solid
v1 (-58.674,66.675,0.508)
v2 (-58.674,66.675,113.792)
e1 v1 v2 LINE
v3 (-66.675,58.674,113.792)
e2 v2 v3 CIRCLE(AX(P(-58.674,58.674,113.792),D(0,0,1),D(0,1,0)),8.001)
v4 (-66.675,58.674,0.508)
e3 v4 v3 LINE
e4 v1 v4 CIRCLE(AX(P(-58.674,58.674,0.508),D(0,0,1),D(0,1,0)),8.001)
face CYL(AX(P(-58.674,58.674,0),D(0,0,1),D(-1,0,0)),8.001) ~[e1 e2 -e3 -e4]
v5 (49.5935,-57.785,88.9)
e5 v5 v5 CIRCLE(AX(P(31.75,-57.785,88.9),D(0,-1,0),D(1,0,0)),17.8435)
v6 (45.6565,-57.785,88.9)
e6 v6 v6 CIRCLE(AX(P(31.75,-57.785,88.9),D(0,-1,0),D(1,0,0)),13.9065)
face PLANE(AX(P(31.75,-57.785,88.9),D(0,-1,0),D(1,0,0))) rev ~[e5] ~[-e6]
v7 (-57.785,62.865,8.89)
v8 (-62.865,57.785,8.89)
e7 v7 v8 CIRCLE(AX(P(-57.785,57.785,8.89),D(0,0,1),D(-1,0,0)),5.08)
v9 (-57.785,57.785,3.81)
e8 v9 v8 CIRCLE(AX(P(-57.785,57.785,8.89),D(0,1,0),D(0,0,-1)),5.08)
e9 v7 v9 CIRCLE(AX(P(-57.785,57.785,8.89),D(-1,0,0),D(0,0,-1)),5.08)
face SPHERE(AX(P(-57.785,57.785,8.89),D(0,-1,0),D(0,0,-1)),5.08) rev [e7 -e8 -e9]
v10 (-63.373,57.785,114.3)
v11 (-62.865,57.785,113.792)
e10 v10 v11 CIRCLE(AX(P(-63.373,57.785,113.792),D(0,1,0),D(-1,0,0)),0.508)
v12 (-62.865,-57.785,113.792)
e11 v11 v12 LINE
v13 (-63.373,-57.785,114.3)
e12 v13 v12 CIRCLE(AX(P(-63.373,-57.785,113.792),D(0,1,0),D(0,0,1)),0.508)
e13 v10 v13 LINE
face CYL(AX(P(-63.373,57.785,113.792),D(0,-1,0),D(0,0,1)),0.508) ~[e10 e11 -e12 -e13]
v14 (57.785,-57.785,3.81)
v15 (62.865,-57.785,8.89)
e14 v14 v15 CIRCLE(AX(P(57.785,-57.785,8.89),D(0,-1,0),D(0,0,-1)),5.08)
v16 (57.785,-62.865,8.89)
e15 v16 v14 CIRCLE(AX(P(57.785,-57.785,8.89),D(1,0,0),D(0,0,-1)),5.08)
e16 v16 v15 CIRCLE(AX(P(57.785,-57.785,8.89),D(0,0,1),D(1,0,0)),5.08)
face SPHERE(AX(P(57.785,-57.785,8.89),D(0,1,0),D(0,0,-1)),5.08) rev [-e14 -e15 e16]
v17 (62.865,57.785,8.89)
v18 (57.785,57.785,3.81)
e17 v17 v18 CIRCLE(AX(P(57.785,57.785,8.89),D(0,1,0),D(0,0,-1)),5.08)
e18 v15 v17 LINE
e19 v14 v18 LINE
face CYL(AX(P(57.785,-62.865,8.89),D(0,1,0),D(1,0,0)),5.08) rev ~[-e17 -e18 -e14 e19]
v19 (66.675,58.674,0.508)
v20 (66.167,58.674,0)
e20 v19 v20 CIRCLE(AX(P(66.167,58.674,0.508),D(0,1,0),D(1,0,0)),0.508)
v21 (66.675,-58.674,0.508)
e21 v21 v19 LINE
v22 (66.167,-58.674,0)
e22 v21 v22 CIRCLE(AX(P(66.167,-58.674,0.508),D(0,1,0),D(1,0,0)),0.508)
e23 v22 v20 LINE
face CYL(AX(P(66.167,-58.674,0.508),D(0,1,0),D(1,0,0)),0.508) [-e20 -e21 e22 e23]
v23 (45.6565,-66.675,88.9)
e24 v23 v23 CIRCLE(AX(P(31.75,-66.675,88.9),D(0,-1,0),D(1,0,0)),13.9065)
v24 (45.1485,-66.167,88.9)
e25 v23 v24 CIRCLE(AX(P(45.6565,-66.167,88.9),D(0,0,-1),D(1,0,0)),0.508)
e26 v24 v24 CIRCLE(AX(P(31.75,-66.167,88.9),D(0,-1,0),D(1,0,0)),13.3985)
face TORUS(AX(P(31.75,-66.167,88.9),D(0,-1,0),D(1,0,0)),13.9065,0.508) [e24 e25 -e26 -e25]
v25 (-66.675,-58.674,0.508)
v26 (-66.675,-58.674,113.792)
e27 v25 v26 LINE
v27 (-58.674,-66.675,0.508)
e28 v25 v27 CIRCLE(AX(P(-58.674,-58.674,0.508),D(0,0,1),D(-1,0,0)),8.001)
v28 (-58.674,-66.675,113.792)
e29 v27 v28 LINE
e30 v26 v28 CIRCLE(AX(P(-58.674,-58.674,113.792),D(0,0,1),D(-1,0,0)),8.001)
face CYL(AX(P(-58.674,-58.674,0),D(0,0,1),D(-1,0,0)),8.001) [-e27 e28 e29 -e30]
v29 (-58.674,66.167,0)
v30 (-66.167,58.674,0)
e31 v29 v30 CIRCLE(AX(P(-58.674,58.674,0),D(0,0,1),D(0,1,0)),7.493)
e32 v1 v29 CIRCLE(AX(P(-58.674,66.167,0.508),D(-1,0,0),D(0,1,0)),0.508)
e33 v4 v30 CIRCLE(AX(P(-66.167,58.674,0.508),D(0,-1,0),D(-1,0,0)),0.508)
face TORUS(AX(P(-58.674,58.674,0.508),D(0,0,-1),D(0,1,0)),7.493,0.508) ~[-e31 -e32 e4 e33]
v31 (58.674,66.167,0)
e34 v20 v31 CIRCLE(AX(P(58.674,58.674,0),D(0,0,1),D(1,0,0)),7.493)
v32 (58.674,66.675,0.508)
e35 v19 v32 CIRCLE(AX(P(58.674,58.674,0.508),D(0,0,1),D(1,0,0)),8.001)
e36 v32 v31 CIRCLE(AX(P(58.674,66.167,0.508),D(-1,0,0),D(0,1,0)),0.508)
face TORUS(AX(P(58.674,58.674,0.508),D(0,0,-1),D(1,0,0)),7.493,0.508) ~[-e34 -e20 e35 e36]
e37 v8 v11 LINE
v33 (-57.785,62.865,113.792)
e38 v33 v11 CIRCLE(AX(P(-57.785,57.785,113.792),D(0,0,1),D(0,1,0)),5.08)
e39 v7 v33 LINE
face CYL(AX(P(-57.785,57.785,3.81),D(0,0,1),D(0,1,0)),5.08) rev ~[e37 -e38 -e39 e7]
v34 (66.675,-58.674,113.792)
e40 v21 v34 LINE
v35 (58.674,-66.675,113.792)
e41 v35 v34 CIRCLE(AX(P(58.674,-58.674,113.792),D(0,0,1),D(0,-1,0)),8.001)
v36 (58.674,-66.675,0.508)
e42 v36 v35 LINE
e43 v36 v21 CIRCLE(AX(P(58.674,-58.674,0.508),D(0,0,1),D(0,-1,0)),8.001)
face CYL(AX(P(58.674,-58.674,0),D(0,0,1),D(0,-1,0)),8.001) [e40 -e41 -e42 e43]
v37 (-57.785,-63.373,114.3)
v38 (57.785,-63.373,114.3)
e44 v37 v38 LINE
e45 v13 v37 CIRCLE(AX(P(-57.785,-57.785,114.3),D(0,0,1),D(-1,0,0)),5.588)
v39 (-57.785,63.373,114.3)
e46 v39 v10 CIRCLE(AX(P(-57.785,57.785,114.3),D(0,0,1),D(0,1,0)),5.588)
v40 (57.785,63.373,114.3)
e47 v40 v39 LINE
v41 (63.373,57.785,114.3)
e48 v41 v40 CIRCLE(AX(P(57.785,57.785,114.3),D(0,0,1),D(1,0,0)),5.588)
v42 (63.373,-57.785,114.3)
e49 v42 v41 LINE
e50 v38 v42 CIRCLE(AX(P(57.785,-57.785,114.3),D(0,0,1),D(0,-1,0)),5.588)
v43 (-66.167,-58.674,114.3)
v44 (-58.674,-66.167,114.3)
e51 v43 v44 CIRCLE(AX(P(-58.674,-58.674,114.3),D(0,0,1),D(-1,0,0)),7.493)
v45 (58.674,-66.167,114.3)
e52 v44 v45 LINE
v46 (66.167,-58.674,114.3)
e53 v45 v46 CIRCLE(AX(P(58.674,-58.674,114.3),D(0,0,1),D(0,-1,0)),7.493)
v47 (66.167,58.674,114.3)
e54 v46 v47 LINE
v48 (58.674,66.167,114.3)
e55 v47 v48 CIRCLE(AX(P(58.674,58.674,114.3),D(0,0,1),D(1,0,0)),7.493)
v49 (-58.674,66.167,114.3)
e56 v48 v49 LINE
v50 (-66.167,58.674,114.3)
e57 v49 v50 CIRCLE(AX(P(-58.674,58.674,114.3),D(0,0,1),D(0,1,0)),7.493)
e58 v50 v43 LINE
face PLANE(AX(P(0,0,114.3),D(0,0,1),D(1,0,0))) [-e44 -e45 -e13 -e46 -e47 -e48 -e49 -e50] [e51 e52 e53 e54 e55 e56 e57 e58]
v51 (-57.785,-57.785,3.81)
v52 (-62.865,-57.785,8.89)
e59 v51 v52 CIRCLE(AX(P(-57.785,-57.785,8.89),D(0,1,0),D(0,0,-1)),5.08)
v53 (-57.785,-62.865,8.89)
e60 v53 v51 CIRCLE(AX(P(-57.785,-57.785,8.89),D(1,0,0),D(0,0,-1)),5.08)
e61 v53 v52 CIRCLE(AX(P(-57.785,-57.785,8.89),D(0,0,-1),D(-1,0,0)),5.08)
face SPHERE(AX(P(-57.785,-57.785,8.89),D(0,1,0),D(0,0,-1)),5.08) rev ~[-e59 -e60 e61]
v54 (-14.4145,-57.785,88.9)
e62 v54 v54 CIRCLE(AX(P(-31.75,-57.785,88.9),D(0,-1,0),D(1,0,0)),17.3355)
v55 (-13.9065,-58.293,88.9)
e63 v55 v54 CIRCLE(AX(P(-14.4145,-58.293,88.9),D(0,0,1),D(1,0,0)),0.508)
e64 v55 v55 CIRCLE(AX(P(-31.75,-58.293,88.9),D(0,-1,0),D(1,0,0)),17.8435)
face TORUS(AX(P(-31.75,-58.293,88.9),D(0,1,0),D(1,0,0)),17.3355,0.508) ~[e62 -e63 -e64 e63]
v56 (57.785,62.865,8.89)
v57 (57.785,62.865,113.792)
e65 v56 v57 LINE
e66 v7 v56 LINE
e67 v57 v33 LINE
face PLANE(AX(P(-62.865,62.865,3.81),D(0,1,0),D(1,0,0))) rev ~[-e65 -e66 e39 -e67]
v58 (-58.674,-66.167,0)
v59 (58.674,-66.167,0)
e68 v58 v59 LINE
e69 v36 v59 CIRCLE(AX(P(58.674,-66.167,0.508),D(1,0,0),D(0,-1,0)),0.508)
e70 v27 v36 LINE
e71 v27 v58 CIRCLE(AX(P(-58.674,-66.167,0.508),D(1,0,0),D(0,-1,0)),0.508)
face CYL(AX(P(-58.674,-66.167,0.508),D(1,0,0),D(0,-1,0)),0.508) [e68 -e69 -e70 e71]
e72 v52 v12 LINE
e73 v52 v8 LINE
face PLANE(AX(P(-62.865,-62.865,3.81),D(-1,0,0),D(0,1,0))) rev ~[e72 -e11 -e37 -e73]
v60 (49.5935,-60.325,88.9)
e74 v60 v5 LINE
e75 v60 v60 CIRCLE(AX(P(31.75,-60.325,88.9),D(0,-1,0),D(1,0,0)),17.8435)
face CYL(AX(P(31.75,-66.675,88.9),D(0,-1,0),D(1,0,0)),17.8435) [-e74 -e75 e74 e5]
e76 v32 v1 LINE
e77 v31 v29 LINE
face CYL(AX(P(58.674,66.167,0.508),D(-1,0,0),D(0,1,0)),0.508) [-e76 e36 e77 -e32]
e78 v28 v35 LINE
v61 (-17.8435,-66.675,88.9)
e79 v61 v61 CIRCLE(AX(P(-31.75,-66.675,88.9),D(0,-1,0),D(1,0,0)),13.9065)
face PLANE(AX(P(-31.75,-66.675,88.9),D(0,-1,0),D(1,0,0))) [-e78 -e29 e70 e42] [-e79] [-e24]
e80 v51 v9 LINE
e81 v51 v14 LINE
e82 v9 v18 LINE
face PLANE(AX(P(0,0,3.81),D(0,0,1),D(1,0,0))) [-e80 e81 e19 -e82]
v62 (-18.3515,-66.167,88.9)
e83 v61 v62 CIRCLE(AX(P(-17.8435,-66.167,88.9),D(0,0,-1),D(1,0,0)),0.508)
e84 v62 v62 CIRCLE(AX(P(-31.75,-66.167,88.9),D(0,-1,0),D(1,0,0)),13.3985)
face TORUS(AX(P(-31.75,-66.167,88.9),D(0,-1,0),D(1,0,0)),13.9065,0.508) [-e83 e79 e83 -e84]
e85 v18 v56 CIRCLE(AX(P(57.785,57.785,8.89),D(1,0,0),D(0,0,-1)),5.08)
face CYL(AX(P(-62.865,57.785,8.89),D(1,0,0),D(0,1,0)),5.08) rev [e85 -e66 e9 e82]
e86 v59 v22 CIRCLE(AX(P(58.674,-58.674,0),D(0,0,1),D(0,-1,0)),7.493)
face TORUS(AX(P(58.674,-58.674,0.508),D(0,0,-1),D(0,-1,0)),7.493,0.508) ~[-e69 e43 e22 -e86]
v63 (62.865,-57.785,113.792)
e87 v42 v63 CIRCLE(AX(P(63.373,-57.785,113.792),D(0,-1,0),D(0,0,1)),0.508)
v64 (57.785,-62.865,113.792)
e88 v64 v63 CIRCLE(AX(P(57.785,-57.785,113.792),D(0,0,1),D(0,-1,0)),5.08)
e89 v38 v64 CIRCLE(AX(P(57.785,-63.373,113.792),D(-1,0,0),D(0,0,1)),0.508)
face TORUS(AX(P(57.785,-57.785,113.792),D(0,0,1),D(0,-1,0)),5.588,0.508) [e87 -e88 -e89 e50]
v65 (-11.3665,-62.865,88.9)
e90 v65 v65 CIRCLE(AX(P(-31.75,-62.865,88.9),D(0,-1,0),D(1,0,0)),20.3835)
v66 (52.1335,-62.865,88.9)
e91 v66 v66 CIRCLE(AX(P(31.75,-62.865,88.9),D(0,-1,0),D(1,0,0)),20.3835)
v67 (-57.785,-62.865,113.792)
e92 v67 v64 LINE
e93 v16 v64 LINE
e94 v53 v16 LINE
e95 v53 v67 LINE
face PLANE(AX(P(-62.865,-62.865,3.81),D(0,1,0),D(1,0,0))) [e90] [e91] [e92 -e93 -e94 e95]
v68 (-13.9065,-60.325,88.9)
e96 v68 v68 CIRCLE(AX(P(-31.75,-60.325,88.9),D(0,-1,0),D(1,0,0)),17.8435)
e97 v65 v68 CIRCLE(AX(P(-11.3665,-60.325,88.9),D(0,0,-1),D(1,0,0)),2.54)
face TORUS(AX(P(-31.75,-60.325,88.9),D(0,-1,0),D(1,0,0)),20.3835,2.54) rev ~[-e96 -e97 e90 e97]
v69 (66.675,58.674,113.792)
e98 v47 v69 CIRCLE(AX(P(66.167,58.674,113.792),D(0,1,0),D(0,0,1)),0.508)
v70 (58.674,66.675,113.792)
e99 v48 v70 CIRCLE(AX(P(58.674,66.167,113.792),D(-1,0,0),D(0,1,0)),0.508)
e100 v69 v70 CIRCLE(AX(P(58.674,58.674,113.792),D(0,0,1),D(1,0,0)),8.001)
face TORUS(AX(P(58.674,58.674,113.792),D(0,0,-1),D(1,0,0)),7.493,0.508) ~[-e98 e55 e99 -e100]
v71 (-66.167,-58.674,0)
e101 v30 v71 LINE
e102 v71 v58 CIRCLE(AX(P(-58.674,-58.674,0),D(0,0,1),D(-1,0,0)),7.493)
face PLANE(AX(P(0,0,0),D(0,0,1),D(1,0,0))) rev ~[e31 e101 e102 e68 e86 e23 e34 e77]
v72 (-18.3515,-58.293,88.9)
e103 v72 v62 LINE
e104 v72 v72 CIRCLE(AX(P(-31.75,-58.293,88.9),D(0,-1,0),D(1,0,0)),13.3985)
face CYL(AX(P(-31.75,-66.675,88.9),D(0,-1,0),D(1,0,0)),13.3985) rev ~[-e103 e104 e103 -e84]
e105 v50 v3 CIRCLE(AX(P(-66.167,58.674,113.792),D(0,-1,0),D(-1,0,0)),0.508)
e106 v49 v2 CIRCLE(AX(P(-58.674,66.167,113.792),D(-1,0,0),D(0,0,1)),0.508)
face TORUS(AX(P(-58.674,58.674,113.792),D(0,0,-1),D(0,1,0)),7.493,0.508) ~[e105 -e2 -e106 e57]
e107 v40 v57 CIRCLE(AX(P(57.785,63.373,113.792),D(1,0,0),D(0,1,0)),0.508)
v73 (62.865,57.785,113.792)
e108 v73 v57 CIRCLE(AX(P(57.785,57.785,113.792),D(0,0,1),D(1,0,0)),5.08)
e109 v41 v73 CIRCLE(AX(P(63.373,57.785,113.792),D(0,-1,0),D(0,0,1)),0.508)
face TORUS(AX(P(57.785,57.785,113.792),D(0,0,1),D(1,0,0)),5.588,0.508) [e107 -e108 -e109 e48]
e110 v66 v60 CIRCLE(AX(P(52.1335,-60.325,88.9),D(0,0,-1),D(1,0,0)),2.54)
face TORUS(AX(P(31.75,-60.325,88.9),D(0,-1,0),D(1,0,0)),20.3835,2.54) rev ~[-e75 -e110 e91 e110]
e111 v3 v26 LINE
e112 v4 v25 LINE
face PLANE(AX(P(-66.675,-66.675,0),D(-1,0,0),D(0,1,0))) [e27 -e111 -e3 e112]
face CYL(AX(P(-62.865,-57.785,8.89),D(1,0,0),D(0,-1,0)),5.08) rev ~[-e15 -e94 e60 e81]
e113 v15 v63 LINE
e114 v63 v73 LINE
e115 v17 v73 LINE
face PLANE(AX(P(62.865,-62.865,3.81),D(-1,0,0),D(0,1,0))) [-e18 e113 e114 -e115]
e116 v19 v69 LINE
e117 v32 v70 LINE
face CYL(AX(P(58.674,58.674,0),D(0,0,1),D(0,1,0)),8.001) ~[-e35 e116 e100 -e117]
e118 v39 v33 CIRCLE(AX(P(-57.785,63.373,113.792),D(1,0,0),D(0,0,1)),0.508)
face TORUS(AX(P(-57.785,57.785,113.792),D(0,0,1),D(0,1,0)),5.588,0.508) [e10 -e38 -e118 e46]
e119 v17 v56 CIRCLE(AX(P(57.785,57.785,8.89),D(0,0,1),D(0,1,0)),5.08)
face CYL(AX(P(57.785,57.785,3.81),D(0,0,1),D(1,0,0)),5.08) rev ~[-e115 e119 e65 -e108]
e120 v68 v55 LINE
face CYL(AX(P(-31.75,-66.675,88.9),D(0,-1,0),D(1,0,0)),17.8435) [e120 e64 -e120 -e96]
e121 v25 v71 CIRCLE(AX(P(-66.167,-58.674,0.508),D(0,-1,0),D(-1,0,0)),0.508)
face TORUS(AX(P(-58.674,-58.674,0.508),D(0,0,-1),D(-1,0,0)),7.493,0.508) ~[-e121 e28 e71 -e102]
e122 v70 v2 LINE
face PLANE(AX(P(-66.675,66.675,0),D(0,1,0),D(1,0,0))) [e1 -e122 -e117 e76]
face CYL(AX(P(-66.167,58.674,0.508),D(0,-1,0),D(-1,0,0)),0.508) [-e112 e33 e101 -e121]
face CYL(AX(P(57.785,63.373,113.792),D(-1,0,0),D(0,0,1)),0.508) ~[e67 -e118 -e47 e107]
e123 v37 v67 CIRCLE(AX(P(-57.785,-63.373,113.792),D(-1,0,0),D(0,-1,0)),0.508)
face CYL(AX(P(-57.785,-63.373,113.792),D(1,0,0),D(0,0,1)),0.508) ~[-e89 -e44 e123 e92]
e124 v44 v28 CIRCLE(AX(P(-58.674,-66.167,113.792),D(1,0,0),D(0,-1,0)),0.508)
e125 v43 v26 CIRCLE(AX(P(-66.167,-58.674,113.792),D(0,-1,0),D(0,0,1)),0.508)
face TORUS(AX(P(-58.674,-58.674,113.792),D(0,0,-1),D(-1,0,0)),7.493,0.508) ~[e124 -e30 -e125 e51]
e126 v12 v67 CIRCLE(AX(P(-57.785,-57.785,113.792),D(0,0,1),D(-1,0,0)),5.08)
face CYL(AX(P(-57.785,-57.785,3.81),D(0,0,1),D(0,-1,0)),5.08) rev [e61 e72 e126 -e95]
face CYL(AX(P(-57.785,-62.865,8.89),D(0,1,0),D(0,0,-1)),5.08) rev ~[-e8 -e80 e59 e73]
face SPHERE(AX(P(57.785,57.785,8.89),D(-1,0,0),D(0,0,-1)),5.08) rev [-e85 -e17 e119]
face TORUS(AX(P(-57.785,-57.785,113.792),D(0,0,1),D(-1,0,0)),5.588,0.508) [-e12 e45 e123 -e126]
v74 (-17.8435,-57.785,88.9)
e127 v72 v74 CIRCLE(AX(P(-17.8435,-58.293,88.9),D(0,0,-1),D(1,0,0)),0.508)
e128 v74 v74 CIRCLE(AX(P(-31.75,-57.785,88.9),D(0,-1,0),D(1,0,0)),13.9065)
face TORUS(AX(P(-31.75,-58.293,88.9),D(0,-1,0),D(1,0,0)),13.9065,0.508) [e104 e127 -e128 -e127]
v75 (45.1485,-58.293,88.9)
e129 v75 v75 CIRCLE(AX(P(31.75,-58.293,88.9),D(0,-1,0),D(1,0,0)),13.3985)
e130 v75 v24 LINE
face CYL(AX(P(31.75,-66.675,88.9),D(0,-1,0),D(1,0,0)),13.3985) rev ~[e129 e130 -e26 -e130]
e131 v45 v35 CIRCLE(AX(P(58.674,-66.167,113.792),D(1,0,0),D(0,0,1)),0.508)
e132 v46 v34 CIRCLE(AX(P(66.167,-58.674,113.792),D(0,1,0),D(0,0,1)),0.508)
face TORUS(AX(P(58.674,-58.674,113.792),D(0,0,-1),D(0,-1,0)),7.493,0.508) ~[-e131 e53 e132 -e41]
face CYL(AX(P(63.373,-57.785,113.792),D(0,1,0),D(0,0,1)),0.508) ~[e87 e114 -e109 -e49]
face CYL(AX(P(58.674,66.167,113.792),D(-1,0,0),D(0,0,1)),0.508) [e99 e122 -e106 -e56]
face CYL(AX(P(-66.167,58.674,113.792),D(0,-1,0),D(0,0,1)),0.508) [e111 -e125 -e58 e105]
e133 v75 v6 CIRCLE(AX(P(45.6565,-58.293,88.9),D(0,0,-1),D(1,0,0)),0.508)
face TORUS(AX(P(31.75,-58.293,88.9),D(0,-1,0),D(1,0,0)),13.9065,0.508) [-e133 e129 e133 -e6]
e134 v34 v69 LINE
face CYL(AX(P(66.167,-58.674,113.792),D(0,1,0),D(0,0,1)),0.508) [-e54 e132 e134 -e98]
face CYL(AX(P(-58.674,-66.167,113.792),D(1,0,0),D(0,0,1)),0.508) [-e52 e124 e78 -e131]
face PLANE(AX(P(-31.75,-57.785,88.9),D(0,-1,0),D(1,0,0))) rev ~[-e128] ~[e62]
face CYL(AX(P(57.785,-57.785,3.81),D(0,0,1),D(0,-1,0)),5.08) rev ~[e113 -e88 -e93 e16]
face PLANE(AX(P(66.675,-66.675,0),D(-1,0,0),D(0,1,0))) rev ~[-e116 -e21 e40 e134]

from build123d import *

# Parameters (mm, degrees)
F0_W     = 133.35
F0_H     = 133.35
F1_DEPTH = 114.3
F3_W     = 125.73
F3_H     = 125.73
F4_DEPTH = 110.49
F5_R     = 17.8435
F5_R_2   = 13.3985
F6_DEPTH = 8.89
F7_DEPTH = 3.81
F8_R     = 5.08
F9_R     = 8.001
F10_R    = 0.508
F11_R    = 2.54


# Not quite as in the source:
# - two fillets or chamfers of one size are made in one step


with BuildPart() as f1:
    # F0 (on Top) → F1 (new body)
    with BuildSketch(Plane.XY):
        Rectangle(F0_W, F0_H)
    extrude(amount=F1_DEPTH)

    # F3 (on offset) → F4 (cut, through all)
    with BuildSketch(Plane.XY.offset(3.81)):
        Rectangle(F3_W, F3_H)
    extrude(amount=F4_DEPTH, mode=Mode.SUBTRACT)

    # F5 (on face) → F6 (join)
    with BuildSketch(Plane.XZ.offset(66.675)):
        with Locations((-31.75, 88.9)):
            Circle(F5_R)
        with Locations((-31.75, 88.9)):
            Circle(F5_R_2, mode=Mode.SUBTRACT)
        with Locations((31.75, 88.9)):
            Circle(F5_R)
        with Locations((31.75, 88.9)):
            Circle(F5_R_2, mode=Mode.SUBTRACT)
    extrude(amount=-F6_DEPTH)

    # F5 (on face) → F7 (cut, through all)
    with BuildSketch(Plane.XZ.offset(66.675)):
        with Locations((-31.75, 88.9)):
            Circle(F5_R_2)
        with Locations((31.75, 88.9)):
            Circle(F5_R_2)
    extrude(amount=-F7_DEPTH, mode=Mode.SUBTRACT)

    # F8
    f8_edges = [f1.edges().sort_by_distance(p)[0] for p in [
        (-62.865, 0, 3.81),
        (0, 62.865, 3.81),
        (62.865, 0, 3.81),
        (0, -62.865, 3.81),
        (62.865, -62.865, 59.055),
        (-62.865, -62.865, 59.055),
        (-62.865, 62.865, 59.055),
        (62.865, 62.865, 59.055),
    ]]
    fillet(f8_edges, radius=F8_R)

    # F9
    f9_edges = [f1.edges().sort_by_distance(p)[0] for p in [
        (-66.675, 66.675, 57.15),
        (66.675, 66.675, 57.15),
        (-66.675, -66.675, 57.15),
        (66.675, -66.675, 57.15),
    ]]
    fillet(f9_edges, radius=F9_R)

    # F10
    f10_edges = [f1.edges().sort_by_distance(p)[0] for p in [
        (-45.1485, -66.675, 88.9),
        (18.3515, -66.675, 88.9),
        (-45.1485, -57.785, 88.9),
        (18.3515, -57.785, 88.9),
        (66.675, 0, 114.3),
        (64.331561, -64.331561, 114.3),
        (64.331561, 64.331561, 114.3),
        (0, -66.675, 114.3),
        (0, 66.675, 114.3),
        (-64.331561, -64.331561, 114.3),
        (-64.331561, 64.331561, 114.3),
        (-66.675, 0, 114.3),
        (62.865, 0, 114.3),
        (61.377102, -61.377102, 114.3),
        (61.377102, 61.377102, 114.3),
        (0, -62.865, 114.3),
        (0, 62.865, 114.3),
        (-61.377102, -61.377102, 114.3),
        (-61.377102, 61.377102, 114.3),
        (-62.865, 0, 114.3),
        (66.675, 0, 0),
        (64.331561, -64.331561, 0),
        (64.331561, 64.331561, 0),
        (0, -66.675, 0),
        (0, 66.675, 0),
        (-64.331561, -64.331561, 0),
        (-64.331561, 64.331561, 0),
        (-66.675, 0, 0),
        (-49.5935, -57.785, 88.9),
    ]]
    fillet(f10_edges, radius=F10_R)

    # F11
    f11_edges = [f1.edges().sort_by_distance(p)[0] for p in [
        (-49.5935, -62.865, 88.9),
        (13.9065, -62.865, 88.9),
    ]]
    fillet(f11_edges, radius=F11_R)


solid = f1.part
